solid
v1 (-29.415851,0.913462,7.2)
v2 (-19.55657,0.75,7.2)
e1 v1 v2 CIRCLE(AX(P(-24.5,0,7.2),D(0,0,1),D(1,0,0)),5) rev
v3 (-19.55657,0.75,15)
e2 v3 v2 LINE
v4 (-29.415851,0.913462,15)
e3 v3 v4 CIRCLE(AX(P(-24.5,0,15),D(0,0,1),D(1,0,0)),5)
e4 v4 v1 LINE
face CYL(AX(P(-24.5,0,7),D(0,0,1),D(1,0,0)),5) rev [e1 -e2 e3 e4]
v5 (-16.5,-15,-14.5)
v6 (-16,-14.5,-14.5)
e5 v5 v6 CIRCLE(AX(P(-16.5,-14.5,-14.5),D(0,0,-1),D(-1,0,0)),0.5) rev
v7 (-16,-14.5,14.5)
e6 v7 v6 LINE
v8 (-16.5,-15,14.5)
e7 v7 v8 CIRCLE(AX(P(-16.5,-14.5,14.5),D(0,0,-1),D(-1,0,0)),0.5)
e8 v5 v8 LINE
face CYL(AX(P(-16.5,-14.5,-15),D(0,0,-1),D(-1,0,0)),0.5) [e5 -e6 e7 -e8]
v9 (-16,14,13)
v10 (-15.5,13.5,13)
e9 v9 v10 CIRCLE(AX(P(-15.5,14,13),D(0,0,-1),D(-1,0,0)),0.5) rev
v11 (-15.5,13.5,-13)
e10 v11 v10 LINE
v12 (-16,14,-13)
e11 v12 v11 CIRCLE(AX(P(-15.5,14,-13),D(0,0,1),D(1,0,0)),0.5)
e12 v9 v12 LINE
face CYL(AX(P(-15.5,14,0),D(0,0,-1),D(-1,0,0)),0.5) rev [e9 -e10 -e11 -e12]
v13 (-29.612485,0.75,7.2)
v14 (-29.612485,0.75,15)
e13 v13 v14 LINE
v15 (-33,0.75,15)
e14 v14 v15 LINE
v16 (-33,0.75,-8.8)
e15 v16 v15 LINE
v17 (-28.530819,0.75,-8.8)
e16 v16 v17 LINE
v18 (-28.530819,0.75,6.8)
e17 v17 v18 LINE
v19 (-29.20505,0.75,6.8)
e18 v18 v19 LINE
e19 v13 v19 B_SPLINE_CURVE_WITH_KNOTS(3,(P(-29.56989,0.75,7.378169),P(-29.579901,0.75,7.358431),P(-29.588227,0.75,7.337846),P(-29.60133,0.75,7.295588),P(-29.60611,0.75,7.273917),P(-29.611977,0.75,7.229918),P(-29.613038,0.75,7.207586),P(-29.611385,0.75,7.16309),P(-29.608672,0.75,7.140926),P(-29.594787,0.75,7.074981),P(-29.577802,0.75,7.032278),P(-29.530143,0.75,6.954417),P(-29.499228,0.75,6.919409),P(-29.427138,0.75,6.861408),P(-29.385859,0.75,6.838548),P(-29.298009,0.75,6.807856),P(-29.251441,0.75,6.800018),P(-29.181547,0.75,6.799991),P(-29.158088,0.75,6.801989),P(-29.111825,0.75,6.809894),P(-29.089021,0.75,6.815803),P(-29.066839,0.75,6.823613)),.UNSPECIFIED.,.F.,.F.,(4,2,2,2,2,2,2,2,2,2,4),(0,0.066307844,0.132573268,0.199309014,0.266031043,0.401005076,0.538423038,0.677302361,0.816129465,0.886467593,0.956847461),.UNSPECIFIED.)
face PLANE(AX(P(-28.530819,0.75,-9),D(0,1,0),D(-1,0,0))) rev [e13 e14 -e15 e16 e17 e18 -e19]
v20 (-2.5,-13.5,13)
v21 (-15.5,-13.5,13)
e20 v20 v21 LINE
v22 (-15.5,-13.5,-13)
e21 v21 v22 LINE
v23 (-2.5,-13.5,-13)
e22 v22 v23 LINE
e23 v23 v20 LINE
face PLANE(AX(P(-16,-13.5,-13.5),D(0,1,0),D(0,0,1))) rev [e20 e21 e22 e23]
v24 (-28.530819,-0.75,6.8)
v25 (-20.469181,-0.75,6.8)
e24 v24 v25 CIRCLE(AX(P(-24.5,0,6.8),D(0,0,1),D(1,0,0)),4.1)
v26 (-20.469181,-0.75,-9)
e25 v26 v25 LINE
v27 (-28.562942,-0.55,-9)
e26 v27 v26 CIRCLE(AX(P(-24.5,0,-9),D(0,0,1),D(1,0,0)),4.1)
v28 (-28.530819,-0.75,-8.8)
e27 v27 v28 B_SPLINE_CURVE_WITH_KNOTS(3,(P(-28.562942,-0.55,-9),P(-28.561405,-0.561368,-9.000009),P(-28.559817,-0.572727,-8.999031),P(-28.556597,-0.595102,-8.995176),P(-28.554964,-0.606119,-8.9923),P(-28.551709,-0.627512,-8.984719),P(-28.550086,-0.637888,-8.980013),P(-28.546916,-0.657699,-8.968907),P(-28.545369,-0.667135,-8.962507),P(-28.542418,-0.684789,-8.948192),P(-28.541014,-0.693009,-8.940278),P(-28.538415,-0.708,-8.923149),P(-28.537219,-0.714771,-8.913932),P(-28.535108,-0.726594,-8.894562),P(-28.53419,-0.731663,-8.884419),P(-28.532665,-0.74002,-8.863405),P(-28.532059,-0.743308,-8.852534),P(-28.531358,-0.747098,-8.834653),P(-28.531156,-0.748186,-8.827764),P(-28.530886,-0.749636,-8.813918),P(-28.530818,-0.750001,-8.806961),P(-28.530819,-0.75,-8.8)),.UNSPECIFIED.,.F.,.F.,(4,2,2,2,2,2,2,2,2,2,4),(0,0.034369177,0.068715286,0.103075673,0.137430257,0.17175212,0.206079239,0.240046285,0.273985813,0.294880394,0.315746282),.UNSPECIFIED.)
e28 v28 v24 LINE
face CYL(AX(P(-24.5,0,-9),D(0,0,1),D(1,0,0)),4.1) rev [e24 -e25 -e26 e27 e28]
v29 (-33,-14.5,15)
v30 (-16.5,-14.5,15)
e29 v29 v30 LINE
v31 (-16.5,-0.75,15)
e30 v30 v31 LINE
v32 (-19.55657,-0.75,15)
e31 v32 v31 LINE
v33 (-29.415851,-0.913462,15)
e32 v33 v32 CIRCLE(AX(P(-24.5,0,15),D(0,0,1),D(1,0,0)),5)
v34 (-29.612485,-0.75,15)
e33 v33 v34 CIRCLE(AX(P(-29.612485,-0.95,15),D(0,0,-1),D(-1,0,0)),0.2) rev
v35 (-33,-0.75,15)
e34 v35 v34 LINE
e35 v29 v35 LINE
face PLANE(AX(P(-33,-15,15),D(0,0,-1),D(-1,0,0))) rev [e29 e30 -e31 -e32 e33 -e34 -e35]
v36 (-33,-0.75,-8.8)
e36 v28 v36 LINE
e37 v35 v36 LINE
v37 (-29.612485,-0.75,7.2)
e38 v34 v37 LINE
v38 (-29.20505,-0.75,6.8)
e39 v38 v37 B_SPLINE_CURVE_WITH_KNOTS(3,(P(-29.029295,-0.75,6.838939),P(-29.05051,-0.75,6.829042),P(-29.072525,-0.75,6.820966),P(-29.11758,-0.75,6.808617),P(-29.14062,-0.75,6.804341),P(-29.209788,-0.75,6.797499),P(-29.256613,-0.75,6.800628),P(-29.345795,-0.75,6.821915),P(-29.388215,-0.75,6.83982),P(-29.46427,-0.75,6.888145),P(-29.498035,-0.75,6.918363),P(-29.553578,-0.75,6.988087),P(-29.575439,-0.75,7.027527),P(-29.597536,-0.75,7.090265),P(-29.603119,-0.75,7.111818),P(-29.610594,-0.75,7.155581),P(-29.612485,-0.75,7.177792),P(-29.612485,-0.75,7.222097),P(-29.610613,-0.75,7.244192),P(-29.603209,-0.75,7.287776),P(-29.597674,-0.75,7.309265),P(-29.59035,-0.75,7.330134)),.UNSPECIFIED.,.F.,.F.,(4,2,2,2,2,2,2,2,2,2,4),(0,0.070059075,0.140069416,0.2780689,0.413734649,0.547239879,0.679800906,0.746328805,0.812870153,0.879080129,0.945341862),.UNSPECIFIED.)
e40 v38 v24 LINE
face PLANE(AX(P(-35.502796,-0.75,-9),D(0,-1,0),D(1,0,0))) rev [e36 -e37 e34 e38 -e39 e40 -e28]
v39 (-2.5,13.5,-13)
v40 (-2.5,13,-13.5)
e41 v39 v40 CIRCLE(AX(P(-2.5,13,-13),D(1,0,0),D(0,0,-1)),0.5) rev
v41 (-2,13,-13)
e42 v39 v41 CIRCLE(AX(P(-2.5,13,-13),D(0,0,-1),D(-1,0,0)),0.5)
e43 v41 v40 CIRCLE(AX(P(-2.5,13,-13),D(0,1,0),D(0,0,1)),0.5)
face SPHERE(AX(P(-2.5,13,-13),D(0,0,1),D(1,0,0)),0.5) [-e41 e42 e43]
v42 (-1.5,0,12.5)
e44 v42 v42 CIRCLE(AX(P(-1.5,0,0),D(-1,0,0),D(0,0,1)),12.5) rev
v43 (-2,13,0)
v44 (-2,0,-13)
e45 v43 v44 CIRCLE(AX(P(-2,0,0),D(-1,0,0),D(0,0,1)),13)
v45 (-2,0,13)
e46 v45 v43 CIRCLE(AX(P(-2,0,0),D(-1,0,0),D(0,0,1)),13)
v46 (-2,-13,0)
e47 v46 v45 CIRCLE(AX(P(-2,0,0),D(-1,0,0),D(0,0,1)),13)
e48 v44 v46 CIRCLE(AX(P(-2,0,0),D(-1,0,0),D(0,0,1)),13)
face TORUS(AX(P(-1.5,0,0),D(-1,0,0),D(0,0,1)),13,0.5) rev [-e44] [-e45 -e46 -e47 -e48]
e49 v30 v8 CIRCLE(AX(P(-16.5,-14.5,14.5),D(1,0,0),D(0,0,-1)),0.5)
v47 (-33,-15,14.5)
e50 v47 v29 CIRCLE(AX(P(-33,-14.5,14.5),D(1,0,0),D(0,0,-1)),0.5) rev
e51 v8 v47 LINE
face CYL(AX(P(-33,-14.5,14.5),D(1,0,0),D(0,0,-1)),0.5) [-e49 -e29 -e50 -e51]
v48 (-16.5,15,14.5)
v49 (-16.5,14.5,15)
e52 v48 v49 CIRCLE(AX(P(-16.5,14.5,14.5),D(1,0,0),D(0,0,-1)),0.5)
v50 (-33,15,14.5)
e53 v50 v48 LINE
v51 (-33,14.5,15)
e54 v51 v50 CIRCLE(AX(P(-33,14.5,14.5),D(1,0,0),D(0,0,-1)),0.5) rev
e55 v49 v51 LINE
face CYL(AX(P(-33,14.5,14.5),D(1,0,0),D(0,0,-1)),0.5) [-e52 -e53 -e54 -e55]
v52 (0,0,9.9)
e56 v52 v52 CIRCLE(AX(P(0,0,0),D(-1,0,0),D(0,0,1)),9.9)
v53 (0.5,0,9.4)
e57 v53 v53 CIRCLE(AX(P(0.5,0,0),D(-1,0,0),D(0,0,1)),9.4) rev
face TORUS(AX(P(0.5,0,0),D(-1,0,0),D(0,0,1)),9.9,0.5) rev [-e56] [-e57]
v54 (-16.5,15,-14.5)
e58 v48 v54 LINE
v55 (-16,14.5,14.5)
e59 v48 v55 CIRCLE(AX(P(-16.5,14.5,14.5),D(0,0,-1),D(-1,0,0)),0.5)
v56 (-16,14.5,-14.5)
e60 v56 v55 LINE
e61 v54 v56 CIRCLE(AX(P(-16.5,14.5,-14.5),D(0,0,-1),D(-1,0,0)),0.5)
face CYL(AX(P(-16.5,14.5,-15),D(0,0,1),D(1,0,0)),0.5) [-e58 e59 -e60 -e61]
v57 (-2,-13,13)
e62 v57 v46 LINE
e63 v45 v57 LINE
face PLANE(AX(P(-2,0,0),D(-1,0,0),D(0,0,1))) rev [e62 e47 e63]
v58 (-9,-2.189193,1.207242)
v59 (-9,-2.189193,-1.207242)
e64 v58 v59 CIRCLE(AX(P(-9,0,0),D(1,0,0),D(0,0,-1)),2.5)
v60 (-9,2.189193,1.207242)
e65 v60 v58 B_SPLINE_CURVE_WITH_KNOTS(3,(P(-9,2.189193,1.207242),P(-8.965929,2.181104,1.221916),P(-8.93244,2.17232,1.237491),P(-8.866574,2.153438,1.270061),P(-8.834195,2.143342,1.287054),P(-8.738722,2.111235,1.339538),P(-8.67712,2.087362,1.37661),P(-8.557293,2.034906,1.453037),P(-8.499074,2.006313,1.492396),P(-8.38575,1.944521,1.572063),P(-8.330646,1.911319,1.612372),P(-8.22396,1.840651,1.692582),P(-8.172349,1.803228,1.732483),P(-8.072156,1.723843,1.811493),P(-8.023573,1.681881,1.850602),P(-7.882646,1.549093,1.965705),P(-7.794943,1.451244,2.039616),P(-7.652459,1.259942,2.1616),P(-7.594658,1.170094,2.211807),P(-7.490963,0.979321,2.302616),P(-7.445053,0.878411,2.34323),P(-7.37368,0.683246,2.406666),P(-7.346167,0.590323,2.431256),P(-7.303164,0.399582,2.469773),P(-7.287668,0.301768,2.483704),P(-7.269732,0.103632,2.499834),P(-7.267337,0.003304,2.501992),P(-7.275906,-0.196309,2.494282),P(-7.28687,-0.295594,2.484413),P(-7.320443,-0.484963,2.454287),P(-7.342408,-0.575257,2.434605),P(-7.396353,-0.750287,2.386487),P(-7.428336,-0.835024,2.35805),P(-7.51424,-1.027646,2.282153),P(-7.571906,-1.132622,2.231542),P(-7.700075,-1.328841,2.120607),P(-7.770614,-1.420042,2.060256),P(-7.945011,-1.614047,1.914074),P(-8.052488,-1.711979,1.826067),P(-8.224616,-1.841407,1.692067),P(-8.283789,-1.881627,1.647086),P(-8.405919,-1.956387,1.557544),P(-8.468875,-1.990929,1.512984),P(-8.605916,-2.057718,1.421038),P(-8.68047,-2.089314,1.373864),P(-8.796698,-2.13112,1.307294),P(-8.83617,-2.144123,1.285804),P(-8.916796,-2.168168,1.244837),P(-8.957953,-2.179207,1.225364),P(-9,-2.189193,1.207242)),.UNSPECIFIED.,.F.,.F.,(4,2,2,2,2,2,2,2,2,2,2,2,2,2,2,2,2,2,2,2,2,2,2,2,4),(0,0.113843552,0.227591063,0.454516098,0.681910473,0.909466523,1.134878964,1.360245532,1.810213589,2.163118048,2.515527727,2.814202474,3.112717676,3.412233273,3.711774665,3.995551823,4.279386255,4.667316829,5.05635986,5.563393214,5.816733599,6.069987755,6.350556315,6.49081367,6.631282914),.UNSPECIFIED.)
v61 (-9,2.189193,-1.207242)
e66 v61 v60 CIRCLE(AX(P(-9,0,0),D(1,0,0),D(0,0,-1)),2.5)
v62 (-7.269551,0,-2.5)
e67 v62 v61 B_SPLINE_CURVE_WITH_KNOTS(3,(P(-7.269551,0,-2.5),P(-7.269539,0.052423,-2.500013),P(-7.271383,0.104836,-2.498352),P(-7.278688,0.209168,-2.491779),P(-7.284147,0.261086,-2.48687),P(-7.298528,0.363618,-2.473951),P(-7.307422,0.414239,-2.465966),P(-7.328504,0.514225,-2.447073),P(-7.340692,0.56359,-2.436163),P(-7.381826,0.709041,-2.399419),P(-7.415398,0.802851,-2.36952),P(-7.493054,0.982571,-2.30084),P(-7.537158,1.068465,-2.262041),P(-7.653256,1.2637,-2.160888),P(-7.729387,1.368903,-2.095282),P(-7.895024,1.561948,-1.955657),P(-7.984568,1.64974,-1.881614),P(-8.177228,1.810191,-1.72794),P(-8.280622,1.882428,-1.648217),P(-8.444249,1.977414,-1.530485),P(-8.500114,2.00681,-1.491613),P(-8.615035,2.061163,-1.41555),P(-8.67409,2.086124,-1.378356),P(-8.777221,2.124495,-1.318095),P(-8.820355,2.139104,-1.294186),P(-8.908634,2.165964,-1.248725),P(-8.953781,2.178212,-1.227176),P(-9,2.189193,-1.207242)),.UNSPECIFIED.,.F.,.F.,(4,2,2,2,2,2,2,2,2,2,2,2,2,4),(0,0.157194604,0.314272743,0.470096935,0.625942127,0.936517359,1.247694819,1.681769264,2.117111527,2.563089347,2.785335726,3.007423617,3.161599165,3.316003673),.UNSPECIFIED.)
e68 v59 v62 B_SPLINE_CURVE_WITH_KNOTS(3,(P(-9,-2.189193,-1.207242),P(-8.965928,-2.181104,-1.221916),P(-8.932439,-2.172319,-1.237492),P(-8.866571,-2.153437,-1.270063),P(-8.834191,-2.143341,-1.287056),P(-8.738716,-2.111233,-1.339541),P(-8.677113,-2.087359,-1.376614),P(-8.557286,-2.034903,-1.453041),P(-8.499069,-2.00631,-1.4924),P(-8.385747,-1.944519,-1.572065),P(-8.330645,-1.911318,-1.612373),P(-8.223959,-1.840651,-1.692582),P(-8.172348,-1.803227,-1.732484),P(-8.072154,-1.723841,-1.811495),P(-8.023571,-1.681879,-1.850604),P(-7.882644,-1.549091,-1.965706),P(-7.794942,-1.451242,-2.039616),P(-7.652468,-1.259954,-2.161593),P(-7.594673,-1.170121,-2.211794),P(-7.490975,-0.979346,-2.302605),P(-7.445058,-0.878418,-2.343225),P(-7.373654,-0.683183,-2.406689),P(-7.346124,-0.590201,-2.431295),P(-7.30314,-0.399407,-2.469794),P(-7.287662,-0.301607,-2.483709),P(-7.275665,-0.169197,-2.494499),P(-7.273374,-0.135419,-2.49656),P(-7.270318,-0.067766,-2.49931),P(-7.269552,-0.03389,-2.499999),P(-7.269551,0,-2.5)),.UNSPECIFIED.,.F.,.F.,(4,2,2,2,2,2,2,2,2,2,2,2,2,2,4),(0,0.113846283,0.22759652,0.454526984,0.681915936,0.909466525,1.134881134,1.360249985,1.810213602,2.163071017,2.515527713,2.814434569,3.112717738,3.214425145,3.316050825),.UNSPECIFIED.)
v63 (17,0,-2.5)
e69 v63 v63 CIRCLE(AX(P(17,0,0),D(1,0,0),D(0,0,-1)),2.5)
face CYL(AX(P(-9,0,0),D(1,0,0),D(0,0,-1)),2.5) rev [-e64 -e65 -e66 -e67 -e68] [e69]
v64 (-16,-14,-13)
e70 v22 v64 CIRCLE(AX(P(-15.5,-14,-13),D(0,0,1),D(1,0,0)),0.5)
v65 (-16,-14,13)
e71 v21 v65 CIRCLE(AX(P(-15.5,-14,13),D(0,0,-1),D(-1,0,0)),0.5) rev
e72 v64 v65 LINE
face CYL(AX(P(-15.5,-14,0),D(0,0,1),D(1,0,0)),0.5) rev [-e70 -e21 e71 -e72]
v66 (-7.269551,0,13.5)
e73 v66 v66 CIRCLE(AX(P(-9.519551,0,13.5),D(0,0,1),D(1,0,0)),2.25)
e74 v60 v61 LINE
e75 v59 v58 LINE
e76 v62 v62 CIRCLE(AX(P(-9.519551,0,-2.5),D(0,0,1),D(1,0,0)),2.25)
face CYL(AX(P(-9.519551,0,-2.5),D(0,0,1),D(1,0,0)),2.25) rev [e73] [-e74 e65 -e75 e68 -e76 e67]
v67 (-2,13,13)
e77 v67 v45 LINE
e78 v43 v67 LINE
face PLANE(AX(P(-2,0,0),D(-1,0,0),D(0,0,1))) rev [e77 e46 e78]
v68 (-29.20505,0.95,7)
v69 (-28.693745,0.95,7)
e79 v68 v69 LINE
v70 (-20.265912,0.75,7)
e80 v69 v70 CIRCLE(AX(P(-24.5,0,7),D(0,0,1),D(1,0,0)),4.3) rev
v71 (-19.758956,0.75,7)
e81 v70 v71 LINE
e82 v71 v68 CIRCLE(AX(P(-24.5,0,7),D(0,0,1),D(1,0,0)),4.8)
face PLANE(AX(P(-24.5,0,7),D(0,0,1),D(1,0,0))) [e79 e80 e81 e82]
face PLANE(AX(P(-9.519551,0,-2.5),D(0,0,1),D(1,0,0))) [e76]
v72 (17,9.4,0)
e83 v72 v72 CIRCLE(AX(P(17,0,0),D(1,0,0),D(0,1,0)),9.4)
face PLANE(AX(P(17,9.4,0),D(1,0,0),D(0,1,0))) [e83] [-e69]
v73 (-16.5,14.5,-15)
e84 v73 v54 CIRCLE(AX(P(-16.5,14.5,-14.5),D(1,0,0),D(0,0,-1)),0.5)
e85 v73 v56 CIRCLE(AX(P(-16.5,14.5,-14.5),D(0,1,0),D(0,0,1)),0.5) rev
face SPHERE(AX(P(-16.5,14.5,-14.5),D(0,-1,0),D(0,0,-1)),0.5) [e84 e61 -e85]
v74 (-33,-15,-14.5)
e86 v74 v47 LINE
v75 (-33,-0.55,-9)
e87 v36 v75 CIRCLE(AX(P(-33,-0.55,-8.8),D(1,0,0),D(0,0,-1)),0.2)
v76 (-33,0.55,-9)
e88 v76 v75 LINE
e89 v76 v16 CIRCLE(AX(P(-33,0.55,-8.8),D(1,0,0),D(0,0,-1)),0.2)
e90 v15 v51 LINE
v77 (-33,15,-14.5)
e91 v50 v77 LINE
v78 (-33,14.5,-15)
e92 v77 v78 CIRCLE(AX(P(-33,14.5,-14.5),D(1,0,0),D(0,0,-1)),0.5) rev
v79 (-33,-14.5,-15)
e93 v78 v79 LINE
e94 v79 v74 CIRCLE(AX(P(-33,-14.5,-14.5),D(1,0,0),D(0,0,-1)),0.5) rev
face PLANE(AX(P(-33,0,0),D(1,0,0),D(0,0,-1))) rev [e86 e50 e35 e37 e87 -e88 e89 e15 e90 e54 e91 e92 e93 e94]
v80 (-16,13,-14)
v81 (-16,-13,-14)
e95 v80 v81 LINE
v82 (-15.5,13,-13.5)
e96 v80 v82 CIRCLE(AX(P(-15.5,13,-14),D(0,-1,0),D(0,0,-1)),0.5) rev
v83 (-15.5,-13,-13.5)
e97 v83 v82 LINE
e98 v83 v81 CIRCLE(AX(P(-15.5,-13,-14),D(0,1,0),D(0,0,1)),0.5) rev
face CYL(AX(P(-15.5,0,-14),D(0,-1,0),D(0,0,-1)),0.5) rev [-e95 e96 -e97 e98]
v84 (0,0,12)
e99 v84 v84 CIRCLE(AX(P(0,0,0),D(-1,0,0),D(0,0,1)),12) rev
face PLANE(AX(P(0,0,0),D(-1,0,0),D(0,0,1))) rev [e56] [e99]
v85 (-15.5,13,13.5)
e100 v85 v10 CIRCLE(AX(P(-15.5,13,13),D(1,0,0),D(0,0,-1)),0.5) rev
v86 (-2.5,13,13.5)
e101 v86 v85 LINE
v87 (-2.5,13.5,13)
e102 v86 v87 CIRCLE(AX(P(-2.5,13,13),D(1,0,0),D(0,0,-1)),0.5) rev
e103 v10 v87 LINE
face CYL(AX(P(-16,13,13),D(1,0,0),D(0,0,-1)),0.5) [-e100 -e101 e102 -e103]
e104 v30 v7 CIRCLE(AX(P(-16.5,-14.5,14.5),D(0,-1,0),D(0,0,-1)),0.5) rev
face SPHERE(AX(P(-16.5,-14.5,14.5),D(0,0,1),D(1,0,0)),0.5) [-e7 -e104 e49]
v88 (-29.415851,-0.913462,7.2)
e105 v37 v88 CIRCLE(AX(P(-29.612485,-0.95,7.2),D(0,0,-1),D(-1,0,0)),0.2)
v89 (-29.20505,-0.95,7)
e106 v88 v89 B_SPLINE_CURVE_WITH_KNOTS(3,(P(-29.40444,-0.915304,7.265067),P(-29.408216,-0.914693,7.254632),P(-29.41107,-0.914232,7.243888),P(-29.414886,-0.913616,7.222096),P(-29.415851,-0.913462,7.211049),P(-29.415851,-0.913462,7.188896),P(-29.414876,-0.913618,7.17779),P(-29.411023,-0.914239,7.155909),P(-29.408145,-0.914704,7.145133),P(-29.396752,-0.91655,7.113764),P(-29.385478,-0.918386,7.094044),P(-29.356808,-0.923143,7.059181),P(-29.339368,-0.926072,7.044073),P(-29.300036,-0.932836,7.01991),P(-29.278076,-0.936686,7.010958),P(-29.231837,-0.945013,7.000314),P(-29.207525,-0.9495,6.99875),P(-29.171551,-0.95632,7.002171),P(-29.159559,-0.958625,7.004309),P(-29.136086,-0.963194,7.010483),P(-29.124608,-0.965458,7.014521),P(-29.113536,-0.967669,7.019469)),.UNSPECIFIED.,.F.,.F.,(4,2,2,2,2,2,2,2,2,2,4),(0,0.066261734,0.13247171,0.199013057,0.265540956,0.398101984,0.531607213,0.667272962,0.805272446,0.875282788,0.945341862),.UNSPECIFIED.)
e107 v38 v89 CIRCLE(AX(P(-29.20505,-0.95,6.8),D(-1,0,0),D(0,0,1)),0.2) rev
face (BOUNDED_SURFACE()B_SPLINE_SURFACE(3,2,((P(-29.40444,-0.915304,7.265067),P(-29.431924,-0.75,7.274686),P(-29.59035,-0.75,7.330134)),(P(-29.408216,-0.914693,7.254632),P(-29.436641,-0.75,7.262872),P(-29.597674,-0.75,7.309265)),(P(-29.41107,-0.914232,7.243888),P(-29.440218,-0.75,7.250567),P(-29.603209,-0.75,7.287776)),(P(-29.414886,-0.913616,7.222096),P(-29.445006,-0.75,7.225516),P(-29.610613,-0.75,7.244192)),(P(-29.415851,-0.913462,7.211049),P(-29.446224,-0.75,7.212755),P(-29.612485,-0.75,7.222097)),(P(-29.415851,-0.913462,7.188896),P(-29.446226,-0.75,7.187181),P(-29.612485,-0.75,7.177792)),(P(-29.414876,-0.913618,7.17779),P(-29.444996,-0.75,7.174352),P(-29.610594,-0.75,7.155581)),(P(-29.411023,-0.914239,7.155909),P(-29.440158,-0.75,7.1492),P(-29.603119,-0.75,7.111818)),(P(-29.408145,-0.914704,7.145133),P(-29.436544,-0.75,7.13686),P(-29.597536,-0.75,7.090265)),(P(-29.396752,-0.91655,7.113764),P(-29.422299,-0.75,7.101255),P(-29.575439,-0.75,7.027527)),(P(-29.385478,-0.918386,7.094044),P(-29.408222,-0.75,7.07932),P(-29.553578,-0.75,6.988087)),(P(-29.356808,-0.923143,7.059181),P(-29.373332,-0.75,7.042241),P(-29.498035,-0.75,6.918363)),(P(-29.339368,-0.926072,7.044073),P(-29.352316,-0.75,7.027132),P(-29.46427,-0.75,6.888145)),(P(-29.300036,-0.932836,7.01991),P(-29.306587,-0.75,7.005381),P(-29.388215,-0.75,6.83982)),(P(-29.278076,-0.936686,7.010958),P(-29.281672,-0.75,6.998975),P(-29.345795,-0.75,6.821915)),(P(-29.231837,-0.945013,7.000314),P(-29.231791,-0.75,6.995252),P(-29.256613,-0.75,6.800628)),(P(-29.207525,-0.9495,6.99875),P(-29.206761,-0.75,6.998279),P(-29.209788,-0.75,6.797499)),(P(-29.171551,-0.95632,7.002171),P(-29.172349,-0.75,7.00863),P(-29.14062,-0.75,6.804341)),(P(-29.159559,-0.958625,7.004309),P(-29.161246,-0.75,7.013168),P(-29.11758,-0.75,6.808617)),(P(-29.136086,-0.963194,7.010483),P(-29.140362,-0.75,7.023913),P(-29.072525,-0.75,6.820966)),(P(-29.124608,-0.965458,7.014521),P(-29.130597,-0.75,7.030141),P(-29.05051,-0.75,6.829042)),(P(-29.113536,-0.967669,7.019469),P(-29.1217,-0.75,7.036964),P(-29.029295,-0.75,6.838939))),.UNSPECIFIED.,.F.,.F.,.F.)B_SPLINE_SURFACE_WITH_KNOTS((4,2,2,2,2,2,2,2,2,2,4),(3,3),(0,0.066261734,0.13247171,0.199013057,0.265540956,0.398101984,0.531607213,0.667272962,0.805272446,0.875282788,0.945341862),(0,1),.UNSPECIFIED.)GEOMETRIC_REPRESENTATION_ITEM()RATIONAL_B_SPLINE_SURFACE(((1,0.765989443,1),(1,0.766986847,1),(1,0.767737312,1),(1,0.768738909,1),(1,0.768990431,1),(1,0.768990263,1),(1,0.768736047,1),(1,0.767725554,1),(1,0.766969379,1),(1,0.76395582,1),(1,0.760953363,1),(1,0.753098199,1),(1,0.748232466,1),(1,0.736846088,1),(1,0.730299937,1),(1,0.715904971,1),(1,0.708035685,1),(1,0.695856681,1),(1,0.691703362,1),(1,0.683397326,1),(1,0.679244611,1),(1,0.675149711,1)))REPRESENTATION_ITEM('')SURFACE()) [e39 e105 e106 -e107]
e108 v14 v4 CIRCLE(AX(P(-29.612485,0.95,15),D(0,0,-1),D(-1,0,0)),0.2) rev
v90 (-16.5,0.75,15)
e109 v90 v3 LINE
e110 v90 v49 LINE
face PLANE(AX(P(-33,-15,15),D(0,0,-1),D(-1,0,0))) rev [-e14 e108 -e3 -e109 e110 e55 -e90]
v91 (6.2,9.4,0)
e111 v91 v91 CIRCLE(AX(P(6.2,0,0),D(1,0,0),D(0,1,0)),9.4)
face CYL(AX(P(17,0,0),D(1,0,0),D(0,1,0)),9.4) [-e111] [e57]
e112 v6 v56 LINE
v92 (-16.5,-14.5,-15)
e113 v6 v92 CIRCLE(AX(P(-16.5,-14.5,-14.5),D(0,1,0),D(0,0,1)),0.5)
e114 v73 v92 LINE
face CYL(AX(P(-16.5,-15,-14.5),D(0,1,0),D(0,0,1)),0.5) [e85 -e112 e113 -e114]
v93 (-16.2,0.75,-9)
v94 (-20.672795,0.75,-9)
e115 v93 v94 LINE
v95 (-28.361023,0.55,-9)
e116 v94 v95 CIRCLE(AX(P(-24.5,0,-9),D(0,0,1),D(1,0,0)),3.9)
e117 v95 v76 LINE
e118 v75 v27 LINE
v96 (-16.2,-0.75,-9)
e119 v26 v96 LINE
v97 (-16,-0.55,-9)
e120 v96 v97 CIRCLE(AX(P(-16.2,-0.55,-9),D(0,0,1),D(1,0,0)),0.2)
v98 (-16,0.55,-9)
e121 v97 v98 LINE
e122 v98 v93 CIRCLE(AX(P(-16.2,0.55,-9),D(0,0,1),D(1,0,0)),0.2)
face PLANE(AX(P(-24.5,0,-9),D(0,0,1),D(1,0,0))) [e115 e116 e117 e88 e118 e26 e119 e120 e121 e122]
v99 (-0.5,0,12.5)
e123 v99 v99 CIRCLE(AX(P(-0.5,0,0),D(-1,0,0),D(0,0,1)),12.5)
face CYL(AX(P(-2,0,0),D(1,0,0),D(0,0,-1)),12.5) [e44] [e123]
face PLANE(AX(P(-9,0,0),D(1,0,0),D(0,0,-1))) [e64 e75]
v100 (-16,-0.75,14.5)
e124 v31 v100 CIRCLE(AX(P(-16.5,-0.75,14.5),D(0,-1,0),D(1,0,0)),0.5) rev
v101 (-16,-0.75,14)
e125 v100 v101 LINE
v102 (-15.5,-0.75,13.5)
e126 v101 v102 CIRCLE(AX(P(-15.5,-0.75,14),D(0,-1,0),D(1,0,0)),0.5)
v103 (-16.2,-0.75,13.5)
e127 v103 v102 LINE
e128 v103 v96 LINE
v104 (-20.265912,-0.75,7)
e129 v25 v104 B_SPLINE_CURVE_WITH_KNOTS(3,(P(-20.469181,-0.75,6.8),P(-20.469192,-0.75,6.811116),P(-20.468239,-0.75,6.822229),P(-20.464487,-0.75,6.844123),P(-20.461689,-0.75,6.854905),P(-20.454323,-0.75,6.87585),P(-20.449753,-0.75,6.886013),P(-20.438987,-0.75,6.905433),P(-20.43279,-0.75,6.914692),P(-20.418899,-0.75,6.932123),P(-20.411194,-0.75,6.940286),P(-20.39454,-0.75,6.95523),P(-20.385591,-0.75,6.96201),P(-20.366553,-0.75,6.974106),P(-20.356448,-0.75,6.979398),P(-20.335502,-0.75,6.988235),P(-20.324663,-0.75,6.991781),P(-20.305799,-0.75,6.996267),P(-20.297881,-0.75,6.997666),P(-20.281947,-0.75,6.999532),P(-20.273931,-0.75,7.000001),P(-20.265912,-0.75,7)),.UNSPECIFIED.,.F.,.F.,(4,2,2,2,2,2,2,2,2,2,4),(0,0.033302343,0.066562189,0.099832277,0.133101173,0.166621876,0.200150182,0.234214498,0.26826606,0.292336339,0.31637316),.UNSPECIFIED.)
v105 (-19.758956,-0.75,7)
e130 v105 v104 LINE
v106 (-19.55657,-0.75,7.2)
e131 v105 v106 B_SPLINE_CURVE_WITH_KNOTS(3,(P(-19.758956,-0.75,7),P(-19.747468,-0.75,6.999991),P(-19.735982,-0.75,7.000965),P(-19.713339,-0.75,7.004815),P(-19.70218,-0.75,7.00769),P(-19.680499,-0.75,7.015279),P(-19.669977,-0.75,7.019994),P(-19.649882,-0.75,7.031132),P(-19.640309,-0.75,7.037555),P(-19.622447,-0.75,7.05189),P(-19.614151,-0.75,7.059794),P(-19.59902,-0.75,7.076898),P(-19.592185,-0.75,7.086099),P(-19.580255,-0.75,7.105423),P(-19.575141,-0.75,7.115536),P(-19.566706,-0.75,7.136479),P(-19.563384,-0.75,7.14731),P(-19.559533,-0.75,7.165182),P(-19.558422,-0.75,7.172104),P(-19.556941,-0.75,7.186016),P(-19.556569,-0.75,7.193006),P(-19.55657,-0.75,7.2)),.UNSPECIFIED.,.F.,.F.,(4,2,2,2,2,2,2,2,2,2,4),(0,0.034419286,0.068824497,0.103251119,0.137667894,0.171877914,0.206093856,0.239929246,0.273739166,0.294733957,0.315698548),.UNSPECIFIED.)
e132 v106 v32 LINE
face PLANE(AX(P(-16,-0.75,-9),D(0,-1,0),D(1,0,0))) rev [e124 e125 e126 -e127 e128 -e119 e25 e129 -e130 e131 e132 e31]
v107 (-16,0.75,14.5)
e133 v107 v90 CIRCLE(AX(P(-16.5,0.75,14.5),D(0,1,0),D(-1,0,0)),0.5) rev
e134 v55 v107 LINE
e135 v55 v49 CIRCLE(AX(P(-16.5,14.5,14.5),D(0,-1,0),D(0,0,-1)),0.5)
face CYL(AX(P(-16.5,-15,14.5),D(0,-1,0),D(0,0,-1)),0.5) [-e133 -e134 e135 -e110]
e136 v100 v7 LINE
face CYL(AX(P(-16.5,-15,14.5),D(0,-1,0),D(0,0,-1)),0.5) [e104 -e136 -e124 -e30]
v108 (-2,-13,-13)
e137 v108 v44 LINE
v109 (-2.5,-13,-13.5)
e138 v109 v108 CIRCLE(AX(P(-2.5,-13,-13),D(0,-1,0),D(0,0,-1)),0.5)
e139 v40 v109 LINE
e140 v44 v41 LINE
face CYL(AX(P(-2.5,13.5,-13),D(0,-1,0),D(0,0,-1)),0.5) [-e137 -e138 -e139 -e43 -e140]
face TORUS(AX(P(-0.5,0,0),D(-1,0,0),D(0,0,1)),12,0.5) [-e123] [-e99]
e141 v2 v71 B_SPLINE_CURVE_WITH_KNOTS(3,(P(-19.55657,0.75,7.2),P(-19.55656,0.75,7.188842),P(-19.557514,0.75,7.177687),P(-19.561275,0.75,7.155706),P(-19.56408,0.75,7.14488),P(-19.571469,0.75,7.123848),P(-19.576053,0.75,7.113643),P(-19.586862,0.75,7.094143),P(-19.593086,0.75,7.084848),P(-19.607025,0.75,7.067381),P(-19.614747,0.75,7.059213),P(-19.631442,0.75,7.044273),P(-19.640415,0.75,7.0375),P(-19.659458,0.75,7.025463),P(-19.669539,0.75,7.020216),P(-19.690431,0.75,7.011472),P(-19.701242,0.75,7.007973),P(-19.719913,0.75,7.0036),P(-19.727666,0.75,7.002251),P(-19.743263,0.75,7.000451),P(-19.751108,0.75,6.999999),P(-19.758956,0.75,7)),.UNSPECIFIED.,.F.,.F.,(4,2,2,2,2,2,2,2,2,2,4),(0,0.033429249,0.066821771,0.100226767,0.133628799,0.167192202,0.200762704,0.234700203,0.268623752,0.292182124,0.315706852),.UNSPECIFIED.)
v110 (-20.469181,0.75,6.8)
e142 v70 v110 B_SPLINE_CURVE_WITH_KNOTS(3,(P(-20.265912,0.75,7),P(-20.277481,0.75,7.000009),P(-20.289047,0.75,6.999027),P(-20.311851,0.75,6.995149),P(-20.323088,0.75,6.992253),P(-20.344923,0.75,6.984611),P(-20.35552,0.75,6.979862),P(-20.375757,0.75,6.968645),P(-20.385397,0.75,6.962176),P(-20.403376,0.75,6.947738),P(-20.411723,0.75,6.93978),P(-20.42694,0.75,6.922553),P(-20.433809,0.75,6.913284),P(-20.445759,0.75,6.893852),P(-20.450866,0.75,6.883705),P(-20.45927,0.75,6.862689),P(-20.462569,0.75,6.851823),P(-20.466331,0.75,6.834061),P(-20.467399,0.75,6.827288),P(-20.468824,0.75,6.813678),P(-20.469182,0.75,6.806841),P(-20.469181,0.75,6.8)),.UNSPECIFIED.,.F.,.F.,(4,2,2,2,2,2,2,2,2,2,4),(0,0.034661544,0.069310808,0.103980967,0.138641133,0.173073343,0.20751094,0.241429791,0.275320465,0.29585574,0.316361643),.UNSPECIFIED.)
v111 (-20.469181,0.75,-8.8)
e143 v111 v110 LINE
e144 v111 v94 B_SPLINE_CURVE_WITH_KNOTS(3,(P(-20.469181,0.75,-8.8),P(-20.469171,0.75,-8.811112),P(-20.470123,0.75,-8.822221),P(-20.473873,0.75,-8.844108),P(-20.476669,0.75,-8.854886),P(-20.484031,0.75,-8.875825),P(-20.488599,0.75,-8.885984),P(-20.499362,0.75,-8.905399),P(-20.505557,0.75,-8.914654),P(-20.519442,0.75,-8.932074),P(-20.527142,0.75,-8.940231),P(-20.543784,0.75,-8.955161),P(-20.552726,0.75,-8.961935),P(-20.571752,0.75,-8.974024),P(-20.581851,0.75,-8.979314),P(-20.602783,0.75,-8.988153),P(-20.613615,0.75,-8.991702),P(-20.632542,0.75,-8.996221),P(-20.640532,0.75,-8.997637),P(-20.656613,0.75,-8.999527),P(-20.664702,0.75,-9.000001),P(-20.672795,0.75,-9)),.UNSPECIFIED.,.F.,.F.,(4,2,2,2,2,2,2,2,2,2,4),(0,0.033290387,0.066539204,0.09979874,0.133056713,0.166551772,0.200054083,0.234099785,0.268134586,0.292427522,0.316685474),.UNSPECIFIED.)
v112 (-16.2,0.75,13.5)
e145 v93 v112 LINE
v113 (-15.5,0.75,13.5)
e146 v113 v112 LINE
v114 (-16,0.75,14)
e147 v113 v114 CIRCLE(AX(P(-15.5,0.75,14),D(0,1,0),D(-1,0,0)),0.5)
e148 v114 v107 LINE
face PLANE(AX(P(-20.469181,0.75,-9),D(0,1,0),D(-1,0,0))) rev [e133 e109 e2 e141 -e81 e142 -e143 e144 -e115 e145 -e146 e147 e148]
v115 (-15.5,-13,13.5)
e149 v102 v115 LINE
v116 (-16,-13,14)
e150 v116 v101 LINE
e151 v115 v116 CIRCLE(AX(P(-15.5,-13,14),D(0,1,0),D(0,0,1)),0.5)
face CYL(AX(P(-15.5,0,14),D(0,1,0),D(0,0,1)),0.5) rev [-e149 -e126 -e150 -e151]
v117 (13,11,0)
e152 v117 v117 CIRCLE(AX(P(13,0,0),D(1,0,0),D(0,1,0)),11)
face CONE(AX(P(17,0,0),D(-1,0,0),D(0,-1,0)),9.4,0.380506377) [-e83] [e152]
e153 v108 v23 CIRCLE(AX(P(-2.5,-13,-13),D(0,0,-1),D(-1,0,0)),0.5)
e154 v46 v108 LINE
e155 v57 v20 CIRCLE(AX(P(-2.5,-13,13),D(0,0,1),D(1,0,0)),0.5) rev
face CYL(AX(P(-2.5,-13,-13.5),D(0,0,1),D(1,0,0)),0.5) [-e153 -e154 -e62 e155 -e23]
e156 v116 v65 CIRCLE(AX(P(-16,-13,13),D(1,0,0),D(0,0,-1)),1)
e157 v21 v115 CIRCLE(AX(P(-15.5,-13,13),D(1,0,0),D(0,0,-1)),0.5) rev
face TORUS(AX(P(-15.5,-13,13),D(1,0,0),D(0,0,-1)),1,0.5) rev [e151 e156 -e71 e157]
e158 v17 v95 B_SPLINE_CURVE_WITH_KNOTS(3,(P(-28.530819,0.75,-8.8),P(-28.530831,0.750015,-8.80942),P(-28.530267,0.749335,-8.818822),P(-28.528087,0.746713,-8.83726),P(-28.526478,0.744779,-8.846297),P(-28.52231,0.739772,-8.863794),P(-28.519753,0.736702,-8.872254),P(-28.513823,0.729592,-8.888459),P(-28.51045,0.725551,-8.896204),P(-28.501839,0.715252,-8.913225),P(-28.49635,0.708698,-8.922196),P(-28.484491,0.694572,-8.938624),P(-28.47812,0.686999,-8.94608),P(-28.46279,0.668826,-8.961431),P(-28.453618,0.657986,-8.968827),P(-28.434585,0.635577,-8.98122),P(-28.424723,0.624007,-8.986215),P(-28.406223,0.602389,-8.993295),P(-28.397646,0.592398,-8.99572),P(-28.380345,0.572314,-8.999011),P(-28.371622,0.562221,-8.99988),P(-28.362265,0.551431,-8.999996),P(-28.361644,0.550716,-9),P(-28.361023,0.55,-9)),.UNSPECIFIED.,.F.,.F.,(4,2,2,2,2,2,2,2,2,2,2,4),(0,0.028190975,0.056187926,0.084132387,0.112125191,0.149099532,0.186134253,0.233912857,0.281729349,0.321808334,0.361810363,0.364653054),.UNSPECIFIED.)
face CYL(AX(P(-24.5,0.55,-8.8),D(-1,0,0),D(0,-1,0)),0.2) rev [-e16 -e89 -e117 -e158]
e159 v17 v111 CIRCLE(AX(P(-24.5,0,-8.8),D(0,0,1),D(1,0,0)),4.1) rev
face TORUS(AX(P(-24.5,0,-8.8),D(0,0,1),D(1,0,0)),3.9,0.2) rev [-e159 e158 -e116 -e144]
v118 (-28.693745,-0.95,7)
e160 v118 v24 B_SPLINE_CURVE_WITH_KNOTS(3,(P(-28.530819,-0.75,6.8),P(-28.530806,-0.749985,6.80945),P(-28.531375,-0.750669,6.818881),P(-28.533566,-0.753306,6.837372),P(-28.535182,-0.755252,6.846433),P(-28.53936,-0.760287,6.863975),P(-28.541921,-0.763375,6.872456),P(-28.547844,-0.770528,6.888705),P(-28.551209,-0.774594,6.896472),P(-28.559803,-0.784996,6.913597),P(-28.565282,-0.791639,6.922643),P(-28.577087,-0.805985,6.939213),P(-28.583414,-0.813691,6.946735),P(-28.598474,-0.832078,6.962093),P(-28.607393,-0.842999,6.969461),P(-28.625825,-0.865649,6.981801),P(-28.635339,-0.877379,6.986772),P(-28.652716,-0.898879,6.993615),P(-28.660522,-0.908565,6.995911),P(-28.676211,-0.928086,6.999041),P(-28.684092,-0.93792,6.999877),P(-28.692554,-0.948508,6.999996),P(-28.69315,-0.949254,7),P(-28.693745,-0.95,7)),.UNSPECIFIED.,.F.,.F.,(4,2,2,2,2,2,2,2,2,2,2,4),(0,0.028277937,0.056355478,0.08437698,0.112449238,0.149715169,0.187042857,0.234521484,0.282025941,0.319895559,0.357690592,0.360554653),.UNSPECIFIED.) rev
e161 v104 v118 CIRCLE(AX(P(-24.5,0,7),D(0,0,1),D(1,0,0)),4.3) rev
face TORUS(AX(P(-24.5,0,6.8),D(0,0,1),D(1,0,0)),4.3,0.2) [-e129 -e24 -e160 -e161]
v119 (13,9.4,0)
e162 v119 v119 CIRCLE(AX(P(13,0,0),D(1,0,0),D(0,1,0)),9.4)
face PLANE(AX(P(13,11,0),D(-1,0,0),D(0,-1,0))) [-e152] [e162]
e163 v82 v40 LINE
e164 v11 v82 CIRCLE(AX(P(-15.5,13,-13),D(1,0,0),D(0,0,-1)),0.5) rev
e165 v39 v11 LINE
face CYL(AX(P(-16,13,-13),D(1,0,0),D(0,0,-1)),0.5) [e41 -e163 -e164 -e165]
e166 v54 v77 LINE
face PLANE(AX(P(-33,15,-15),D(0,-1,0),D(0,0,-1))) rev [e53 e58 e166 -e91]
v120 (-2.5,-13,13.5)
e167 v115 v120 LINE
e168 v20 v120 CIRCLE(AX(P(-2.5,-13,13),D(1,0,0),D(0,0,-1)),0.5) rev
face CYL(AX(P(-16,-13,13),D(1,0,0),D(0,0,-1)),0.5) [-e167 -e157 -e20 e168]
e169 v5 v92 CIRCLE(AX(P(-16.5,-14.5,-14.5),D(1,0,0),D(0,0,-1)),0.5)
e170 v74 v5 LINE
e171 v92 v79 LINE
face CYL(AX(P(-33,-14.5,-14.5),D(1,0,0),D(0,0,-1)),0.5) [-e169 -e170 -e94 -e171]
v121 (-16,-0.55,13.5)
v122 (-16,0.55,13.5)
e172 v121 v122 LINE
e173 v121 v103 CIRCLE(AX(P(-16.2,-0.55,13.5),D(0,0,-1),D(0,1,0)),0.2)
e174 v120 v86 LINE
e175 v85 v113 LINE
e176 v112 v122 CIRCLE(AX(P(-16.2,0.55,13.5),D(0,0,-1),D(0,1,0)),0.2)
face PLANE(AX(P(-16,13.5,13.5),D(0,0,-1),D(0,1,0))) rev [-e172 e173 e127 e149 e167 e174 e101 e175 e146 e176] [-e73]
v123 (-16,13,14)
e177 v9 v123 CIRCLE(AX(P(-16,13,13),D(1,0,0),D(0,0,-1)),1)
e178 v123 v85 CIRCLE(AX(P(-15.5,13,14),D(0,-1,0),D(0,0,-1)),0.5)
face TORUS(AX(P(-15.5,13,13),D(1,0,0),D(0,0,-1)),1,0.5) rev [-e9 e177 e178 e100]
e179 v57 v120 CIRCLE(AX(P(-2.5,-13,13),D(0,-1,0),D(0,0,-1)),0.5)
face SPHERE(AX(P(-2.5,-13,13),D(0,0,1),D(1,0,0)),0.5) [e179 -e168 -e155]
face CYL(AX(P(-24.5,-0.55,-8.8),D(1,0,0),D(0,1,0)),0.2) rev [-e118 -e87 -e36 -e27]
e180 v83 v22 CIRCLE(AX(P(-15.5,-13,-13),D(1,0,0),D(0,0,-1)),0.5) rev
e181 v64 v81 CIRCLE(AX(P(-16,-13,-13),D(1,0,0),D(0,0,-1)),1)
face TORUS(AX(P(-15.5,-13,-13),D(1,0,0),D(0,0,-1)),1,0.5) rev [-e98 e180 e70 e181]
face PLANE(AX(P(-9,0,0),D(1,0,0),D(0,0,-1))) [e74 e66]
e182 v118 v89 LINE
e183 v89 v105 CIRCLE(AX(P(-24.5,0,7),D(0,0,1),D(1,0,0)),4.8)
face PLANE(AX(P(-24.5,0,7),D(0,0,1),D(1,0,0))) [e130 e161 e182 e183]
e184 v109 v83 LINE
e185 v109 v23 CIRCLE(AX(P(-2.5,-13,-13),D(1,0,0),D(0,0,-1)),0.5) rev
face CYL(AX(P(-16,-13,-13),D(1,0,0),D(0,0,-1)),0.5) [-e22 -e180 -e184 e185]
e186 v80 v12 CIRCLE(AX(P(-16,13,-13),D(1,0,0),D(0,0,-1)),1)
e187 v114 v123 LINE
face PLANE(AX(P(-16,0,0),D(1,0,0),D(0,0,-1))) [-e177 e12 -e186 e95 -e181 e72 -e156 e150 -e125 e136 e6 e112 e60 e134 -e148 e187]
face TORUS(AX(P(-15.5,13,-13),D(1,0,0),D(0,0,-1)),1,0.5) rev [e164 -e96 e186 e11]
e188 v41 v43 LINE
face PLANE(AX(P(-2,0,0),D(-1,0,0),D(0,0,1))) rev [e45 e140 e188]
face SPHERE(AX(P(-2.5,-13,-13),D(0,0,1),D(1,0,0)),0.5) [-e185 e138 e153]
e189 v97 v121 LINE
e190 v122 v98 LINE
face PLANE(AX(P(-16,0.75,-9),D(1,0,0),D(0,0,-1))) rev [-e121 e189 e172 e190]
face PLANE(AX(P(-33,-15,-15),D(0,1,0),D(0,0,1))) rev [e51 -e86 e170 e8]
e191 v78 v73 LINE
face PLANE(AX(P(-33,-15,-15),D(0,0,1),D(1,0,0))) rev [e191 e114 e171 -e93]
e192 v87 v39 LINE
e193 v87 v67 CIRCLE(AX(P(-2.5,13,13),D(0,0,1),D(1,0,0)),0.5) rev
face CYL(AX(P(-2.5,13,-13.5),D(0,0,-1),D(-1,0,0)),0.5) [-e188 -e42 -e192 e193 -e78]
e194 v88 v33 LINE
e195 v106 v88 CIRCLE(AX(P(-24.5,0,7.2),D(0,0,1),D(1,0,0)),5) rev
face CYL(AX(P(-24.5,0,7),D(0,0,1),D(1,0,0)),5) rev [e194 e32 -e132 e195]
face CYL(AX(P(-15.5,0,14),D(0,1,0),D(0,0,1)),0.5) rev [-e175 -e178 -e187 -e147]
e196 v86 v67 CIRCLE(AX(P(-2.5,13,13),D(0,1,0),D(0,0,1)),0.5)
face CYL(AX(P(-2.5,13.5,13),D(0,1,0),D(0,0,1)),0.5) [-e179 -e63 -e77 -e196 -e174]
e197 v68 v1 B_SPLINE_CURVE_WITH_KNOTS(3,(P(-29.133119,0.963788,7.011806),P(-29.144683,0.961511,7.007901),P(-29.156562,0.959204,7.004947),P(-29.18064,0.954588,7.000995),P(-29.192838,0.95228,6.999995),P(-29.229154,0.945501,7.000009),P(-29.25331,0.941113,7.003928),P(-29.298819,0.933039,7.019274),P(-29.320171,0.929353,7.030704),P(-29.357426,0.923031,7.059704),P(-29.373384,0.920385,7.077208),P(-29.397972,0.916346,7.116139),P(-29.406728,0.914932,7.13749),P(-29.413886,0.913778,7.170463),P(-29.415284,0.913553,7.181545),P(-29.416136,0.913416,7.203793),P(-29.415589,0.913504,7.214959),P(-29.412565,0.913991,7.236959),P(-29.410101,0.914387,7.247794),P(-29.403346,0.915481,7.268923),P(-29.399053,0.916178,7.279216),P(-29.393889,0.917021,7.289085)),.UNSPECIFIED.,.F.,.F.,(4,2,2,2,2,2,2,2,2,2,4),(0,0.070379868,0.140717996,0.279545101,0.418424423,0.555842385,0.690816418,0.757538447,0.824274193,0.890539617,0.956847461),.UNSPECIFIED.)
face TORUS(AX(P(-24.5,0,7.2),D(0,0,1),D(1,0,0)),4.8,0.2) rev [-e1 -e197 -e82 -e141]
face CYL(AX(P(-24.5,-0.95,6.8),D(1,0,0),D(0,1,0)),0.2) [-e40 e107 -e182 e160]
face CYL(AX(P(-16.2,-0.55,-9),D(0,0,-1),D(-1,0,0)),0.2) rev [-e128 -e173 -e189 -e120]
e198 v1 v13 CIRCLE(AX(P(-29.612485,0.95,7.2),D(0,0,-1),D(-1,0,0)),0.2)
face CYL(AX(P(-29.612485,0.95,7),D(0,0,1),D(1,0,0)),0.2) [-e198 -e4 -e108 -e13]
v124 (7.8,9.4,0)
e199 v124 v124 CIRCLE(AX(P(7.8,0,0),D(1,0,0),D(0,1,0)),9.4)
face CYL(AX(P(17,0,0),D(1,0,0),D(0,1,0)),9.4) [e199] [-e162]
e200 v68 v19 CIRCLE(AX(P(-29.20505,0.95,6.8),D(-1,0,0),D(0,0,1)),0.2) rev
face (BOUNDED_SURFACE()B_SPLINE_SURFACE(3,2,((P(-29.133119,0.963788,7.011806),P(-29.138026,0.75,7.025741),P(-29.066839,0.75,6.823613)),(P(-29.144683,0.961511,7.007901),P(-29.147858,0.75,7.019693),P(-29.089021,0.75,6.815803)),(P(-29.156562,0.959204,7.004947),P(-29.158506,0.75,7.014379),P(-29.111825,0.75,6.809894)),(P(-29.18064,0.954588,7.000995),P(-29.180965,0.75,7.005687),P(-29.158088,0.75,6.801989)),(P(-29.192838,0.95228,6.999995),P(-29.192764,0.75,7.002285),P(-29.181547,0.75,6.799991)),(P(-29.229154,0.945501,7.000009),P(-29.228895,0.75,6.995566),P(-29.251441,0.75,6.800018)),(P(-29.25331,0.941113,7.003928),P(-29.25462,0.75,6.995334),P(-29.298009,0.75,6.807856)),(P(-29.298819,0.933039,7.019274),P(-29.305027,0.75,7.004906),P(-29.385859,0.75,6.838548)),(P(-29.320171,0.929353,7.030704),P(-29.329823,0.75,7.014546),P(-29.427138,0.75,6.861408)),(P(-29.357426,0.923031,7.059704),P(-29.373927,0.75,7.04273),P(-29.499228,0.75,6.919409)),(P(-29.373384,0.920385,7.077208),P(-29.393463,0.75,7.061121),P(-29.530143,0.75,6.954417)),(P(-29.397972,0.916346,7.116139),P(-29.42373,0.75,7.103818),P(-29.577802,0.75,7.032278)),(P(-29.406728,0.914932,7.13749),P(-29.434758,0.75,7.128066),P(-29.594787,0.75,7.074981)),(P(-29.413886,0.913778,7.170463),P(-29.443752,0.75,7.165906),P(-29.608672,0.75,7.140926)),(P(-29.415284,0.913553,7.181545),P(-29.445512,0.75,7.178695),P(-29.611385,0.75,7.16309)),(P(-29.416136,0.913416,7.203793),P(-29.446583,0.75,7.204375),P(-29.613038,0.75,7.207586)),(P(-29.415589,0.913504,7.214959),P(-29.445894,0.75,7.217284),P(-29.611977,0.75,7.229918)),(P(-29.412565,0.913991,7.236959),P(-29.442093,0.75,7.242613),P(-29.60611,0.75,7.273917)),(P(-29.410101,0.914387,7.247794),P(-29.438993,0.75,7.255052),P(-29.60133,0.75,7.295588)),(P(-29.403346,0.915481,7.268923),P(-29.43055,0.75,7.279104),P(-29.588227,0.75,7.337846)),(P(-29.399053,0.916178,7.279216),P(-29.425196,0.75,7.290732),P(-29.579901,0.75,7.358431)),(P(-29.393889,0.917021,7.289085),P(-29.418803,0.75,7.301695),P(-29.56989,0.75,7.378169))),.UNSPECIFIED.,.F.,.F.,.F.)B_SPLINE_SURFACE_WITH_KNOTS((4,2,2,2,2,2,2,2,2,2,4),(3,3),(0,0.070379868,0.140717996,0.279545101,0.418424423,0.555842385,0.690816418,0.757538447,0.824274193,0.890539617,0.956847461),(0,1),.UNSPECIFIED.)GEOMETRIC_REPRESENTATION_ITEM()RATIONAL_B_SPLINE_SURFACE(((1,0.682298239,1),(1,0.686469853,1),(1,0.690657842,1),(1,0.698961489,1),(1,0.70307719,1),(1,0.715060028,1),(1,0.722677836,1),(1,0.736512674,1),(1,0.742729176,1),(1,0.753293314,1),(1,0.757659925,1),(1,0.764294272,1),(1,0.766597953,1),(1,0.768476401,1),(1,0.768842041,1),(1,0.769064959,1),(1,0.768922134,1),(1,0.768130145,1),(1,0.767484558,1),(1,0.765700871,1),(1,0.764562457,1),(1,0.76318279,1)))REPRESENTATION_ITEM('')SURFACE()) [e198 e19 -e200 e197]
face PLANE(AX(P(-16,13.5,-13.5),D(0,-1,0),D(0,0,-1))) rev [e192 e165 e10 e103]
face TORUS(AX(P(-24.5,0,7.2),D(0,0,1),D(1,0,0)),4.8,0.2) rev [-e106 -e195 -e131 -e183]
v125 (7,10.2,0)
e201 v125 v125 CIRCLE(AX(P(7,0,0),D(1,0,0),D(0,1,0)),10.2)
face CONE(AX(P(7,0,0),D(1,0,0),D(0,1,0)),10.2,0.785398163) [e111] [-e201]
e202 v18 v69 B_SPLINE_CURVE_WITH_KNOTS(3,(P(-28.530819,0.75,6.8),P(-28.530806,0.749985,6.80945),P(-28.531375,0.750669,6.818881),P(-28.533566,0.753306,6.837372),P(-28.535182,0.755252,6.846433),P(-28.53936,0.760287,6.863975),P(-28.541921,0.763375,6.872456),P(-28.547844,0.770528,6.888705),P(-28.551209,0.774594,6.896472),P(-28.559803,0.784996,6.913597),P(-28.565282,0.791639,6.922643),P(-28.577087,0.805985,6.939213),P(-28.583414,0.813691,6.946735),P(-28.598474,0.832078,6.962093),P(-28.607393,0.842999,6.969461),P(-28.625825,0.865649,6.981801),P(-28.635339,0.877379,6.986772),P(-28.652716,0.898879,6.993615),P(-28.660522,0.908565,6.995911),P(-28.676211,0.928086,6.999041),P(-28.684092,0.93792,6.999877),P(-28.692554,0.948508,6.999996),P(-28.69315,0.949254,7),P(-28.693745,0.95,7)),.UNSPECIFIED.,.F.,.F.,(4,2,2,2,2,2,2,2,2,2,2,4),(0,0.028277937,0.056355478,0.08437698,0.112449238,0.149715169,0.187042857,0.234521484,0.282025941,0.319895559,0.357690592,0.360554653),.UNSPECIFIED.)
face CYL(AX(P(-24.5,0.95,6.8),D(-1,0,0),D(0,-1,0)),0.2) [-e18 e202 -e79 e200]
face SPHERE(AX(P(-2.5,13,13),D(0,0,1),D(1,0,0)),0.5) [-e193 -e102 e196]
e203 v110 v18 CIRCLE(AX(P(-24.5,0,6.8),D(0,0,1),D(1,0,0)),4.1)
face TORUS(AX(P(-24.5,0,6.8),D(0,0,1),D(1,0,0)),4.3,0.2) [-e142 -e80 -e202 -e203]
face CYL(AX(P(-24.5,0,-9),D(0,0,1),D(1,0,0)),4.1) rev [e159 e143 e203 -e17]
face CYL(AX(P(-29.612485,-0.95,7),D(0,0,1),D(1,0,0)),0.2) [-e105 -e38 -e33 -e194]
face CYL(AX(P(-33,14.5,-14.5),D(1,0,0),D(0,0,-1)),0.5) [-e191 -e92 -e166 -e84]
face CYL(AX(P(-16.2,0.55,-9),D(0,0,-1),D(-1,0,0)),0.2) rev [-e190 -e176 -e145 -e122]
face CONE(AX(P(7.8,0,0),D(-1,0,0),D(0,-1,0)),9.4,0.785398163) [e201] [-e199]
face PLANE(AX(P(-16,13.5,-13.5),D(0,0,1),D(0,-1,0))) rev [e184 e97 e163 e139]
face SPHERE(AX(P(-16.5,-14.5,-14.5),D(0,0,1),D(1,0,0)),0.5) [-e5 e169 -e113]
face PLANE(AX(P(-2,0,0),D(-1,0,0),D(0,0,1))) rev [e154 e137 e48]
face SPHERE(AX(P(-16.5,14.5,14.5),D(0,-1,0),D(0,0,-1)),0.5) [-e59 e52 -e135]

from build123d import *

# Parameters (mm, degrees)
SKETCH5_R           = 12.5
BOSS_EXTRUDE1_DEPTH = 2
SKETCH6_W           = 27
SKETCH6_H           = 27
BOSS_EXTRUDE2_DEPTH = 14
SKETCH8_W           = 30
SKETCH8_H           = 30
BOSS_EXTRUDE3_DEPTH = 17
SKETCH9_R           = 2.25
CUT_EXTRUDE1_DEPTH  = 16
SKETCH10_R          = 2.5
CUT_EXTRUDE2_DEPTH  = 26
CUT_EXTRUDE3_DEPTH  = 24
SKETCH15_R          = 5
CUT_EXTRUDE4_DEPTH  = 8
FILLET3_R           = 0.5
FILLET4_R           = 0.5
FILLET6_R           = 0.2


# Some blends are built 0.0001 mm under size
with BuildPart() as part:
    # Sketch4 → Revolve2 (revolve)
    with BuildSketch(Plane.XY):
        Polygon((0, 0), (0, 9.4), (6.2, 9.4), (7, 10.2), (7.8, 9.4), (13, 9.4), (13, 11), (17, 9.4), (17, 0), align=None)
    revolve(axis=Axis((17, 0, 0), (-1, 0, 0)))

    # Sketch5 → Boss-Extrude1 (add)
    with BuildSketch(Plane.ZY):
        Circle(SKETCH5_R)
    extrude(amount=BOSS_EXTRUDE1_DEPTH)

    # Sketch6 → Boss-Extrude2 (add)
    with BuildSketch(Plane.ZY.offset(2)):
        Rectangle(SKETCH6_W, SKETCH6_H)
    extrude(amount=BOSS_EXTRUDE2_DEPTH)

    # Sketch8 → Boss-Extrude3 (add)
    with BuildSketch(Plane.ZY.offset(16)):
        Rectangle(SKETCH8_W, SKETCH8_H)
    extrude(amount=BOSS_EXTRUDE3_DEPTH)

    # Sketch9 → Cut-Extrude1 (cut)
    with BuildSketch(Plane.XY.offset(13.5)):
        with Locations((-9.519550997, 0)):
            Circle(SKETCH9_R)
    extrude(amount=-CUT_EXTRUDE1_DEPTH, mode=Mode.SUBTRACT)

    # Sketch10 → Cut-Extrude2 (cut)
    with BuildSketch(Plane(origin=(17, 0, 0), x_dir=(0, 0, -1), z_dir=(1, 0, 0))):
        Circle(SKETCH10_R)
    extrude(amount=-CUT_EXTRUDE2_DEPTH, mode=Mode.SUBTRACT)

    # Sketch11 → Cut-Extrude3 (cut)
    with BuildSketch(Plane.XY.offset(15)):
        with BuildLine():
            Line((-20.469181225, 0.75), (-16, 0.75))
            Line((-16, 0.75), (-16, -0.75))
            Line((-16, -0.75), (-20.469181225, -0.75))
            ThreePointArc((-20.469181225, -0.75), (-24.5, -4.1), (-28.530818775, -0.75))
            Line((-28.530818775, -0.75), (-35.502796497, -0.75))
            Line((-35.502796497, -0.75), (-35.502796497, 0.75))
            Line((-35.502796497, 0.75), (-28.530818775, 0.75))
            ThreePointArc((-28.530818775, 0.75), (-24.5, 4.1), (-20.469181225, 0.75))
        make_face()
    extrude(amount=-CUT_EXTRUDE3_DEPTH, mode=Mode.SUBTRACT)

    # Sketch15 → Cut-Extrude4 (cut)
    with BuildSketch(Plane.XY.offset(15)):
        with Locations((-24.5, 0)):
            Circle(SKETCH15_R)
    extrude(amount=-CUT_EXTRUDE4_DEPTH, mode=Mode.SUBTRACT)

    # Fillet3
    fillet3_edges = [part.edges().sort_by_distance(p)[0] for p in [
        (0, -9.4, 0),
        (0, 0, -12.5),
        (-2, 0, -12.5),
        (-2, 0, 13.5),
        (-9, -13.5, 13.5),
        (-2, 13.5, 0),
        (-9, 13.5, 13.5),
        (-2, 0, -13.5),
        (-9, 13.5, -13.5),
        (-2, -13.5, 0),
        (-9, -13.5, -13.5),
        (-16, -7.125, 13.5),
        (-16, 13.5, 0),
        (-16, 0, -13.5),
        (-16, -13.5, 0),
        (-16, -7.875, 15),
        (-16, 0, -15),
        (-16, -15, 0),
        (-16, 7.125, 13.5),
        (-16, 7.875, 15),
    ]]
    fillet(fillet3_edges, radius=FILLET3_R - 0.0001)  # a hair under: the kernel refuses the full size

    # Fillet4
    # the kernel refuses this fillet: 0.5 mm, written as the material it takes off along each edge
    with BuildSketch(Plane(origin=(-16, -14.5, -14.5), x_dir=(0, -1, 0), z_dir=(0, 0, 1))) as fillet4_piece_1:
        with BuildLine():
            CenterArc((0.0001, -0.4999), 0.4999, 0, 90)
            Line((0.5, -0.4999), (0.5, 0))
            Line((0.5, 0), (0.0001, 0))
        make_face()
    revolve(axis=Axis((-16, -14.5, -14.5), (1, 0, 0)), revolution_arc=90, mode=Mode.SUBTRACT)
    with BuildSketch(Plane(origin=(-16, -14.5, 14.5), x_dir=(0, 0, 1), z_dir=(0, 1, 0))) as fillet4_piece_2:
        with BuildLine():
            CenterArc((0.0001, -0.4999), 0.4999, 0, 90)
            Line((0.5, -0.4999), (0.5, 0))
            Line((0.5, 0), (0.0001, 0))
        make_face()
    revolve(axis=Axis((-16, -14.5, 14.5), (1, 0, 0)), revolution_arc=90, mode=Mode.SUBTRACT)
    with BuildSketch(Plane(origin=(-16, 15, 15.7501), x_dir=(-1, 0, 0), z_dir=(0, 0, -1))) as fillet4_piece_3:
        with BuildLine():
            CenterArc((FILLET4_R, -FILLET4_R), FILLET4_R, 90, 90)
            Line((0, -FILLET4_R), (-FILLET4_R * 0.02, -FILLET4_R))
            Line((-FILLET4_R * 0.02, -FILLET4_R), (-FILLET4_R * 0.02, FILLET4_R * 0.02))
            Line((-FILLET4_R * 0.02, FILLET4_R * 0.02), (FILLET4_R, FILLET4_R * 0.02))
            Line((FILLET4_R, FILLET4_R * 0.02), (FILLET4_R, 0))
        make_face()
    extrude(amount=31.5002, mode=Mode.SUBTRACT)
    with BuildSketch(Plane(origin=(-16.4999, 15, -14.5001), x_dir=(0, 0, -1), z_dir=(-1, 0, 0))) as fillet4_piece_4:
        with BuildLine():
            CenterArc((-0.0001, 0.5), FILLET4_R, 270.011459156, 89.988540844)
            Line((0.4999, 0.5), (0.5099, 0.5))
            Line((0.5099, 0.5), (0.5099, -0.01))
            Line((0.5099, -0.01), (0, -0.01))
            Line((0, -0.01), (0, 1e-08))
        make_face()
    revolve(axis=Axis((-16.4999, 15, -14.5001), (0, -1, 0)), revolution_arc=90, mode=Mode.SUBTRACT)
    with BuildSketch(Plane(origin=(-16.4999, 15, 14.5001), x_dir=(1, 0, 0), z_dir=(0, 0, -1))) as fillet4_piece_5:
        with BuildLine():
            CenterArc((-0.0001, 0.5), FILLET4_R, 270.011459156, 89.988540844)
            Line((0.4999, 0.5), (0.5099, 0.5))
            Line((0.5099, 0.5), (0.5099, -0.01))
            Line((0.5099, -0.01), (0, -0.01))
            Line((0, -0.01), (0, 1e-08))
        make_face()
    revolve(axis=Axis((-16.4999, 15, 14.5001), (0, -1, 0)), revolution_arc=90, mode=Mode.SUBTRACT)
    with BuildSketch(Plane(origin=(-16, -15, 15), x_dir=(0, 0, -1), z_dir=(-1, 0, 0))) as fillet4_piece_6:
        with BuildLine():
            CenterArc((FILLET4_R, -FILLET4_R), FILLET4_R, 90, 90)
            Line((0, -FILLET4_R), (-FILLET4_R * 0.02, -FILLET4_R))
            Line((-FILLET4_R * 0.02, -FILLET4_R), (-FILLET4_R * 0.02, FILLET4_R * 0.02))
            Line((-FILLET4_R * 0.02, FILLET4_R * 0.02), (FILLET4_R, FILLET4_R * 0.02))
            Line((FILLET4_R, FILLET4_R * 0.02), (FILLET4_R, 0))
        make_face()
    extrude(amount=17, mode=Mode.SUBTRACT)
    with BuildSketch(Plane(origin=(-15.2499, 15, 15), x_dir=(0, 0, -1), z_dir=(-1, 0, 0)), Plane(origin=(-15.2499, 15, -15), x_dir=(0, -1, 0), z_dir=(-1, 0, 0))) as fillet4_piece_7:
        with BuildLine():
            CenterArc((FILLET4_R, FILLET4_R), FILLET4_R, 180, 90)
            Line((0, FILLET4_R), (-FILLET4_R * 0.02, FILLET4_R))
            Line((-FILLET4_R * 0.02, FILLET4_R), (-FILLET4_R * 0.02, -FILLET4_R * 0.02))
            Line((-FILLET4_R * 0.02, -FILLET4_R * 0.02), (FILLET4_R, -FILLET4_R * 0.02))
            Line((FILLET4_R, -FILLET4_R * 0.02), (FILLET4_R, 0))
        make_face()
    extrude(amount=17.7501, mode=Mode.SUBTRACT)
    with BuildSketch(Plane(origin=(-16, -15, -15), x_dir=(0, 0, 1), z_dir=(-1, 0, 0))) as fillet4_piece_8:
        with BuildLine():
            CenterArc((FILLET4_R, FILLET4_R), FILLET4_R, 180, 90)
            Line((0, FILLET4_R), (-FILLET4_R * 0.02, FILLET4_R))
            Line((-FILLET4_R * 0.02, FILLET4_R), (-FILLET4_R * 0.02, -FILLET4_R * 0.02))
            Line((-FILLET4_R * 0.02, -FILLET4_R * 0.02), (FILLET4_R, -FILLET4_R * 0.02))
            Line((FILLET4_R, -FILLET4_R * 0.02), (FILLET4_R, 0))
        make_face()
    extrude(amount=17, mode=Mode.SUBTRACT)

    # Fillet6
    fillet6_edges = [part.edges().sort_by_distance(p)[0] for p in [
        (-28.987124379, -0.75, 7),
        (-28.987124379, 0.75, 7),
        (-24.5, 4.1, -9),
        (-30.765409388, -0.75, -9),
        (-30.765409388, 0.75, -9),
        (-29.443429983, -0.75, 11),
        (-29.443429983, 0.75, 11),
        (-24.5, -4.1, 7),
        (-24.5, -5, 7),
        (-24.5, 4.1, 7),
        (-24.5, 5, 7),
        (-16, -0.75, 2.25),
        (-16, 0.75, 2.25),
    ]]
    fillet(fillet6_edges, radius=FILLET6_R)


solid = part.part
